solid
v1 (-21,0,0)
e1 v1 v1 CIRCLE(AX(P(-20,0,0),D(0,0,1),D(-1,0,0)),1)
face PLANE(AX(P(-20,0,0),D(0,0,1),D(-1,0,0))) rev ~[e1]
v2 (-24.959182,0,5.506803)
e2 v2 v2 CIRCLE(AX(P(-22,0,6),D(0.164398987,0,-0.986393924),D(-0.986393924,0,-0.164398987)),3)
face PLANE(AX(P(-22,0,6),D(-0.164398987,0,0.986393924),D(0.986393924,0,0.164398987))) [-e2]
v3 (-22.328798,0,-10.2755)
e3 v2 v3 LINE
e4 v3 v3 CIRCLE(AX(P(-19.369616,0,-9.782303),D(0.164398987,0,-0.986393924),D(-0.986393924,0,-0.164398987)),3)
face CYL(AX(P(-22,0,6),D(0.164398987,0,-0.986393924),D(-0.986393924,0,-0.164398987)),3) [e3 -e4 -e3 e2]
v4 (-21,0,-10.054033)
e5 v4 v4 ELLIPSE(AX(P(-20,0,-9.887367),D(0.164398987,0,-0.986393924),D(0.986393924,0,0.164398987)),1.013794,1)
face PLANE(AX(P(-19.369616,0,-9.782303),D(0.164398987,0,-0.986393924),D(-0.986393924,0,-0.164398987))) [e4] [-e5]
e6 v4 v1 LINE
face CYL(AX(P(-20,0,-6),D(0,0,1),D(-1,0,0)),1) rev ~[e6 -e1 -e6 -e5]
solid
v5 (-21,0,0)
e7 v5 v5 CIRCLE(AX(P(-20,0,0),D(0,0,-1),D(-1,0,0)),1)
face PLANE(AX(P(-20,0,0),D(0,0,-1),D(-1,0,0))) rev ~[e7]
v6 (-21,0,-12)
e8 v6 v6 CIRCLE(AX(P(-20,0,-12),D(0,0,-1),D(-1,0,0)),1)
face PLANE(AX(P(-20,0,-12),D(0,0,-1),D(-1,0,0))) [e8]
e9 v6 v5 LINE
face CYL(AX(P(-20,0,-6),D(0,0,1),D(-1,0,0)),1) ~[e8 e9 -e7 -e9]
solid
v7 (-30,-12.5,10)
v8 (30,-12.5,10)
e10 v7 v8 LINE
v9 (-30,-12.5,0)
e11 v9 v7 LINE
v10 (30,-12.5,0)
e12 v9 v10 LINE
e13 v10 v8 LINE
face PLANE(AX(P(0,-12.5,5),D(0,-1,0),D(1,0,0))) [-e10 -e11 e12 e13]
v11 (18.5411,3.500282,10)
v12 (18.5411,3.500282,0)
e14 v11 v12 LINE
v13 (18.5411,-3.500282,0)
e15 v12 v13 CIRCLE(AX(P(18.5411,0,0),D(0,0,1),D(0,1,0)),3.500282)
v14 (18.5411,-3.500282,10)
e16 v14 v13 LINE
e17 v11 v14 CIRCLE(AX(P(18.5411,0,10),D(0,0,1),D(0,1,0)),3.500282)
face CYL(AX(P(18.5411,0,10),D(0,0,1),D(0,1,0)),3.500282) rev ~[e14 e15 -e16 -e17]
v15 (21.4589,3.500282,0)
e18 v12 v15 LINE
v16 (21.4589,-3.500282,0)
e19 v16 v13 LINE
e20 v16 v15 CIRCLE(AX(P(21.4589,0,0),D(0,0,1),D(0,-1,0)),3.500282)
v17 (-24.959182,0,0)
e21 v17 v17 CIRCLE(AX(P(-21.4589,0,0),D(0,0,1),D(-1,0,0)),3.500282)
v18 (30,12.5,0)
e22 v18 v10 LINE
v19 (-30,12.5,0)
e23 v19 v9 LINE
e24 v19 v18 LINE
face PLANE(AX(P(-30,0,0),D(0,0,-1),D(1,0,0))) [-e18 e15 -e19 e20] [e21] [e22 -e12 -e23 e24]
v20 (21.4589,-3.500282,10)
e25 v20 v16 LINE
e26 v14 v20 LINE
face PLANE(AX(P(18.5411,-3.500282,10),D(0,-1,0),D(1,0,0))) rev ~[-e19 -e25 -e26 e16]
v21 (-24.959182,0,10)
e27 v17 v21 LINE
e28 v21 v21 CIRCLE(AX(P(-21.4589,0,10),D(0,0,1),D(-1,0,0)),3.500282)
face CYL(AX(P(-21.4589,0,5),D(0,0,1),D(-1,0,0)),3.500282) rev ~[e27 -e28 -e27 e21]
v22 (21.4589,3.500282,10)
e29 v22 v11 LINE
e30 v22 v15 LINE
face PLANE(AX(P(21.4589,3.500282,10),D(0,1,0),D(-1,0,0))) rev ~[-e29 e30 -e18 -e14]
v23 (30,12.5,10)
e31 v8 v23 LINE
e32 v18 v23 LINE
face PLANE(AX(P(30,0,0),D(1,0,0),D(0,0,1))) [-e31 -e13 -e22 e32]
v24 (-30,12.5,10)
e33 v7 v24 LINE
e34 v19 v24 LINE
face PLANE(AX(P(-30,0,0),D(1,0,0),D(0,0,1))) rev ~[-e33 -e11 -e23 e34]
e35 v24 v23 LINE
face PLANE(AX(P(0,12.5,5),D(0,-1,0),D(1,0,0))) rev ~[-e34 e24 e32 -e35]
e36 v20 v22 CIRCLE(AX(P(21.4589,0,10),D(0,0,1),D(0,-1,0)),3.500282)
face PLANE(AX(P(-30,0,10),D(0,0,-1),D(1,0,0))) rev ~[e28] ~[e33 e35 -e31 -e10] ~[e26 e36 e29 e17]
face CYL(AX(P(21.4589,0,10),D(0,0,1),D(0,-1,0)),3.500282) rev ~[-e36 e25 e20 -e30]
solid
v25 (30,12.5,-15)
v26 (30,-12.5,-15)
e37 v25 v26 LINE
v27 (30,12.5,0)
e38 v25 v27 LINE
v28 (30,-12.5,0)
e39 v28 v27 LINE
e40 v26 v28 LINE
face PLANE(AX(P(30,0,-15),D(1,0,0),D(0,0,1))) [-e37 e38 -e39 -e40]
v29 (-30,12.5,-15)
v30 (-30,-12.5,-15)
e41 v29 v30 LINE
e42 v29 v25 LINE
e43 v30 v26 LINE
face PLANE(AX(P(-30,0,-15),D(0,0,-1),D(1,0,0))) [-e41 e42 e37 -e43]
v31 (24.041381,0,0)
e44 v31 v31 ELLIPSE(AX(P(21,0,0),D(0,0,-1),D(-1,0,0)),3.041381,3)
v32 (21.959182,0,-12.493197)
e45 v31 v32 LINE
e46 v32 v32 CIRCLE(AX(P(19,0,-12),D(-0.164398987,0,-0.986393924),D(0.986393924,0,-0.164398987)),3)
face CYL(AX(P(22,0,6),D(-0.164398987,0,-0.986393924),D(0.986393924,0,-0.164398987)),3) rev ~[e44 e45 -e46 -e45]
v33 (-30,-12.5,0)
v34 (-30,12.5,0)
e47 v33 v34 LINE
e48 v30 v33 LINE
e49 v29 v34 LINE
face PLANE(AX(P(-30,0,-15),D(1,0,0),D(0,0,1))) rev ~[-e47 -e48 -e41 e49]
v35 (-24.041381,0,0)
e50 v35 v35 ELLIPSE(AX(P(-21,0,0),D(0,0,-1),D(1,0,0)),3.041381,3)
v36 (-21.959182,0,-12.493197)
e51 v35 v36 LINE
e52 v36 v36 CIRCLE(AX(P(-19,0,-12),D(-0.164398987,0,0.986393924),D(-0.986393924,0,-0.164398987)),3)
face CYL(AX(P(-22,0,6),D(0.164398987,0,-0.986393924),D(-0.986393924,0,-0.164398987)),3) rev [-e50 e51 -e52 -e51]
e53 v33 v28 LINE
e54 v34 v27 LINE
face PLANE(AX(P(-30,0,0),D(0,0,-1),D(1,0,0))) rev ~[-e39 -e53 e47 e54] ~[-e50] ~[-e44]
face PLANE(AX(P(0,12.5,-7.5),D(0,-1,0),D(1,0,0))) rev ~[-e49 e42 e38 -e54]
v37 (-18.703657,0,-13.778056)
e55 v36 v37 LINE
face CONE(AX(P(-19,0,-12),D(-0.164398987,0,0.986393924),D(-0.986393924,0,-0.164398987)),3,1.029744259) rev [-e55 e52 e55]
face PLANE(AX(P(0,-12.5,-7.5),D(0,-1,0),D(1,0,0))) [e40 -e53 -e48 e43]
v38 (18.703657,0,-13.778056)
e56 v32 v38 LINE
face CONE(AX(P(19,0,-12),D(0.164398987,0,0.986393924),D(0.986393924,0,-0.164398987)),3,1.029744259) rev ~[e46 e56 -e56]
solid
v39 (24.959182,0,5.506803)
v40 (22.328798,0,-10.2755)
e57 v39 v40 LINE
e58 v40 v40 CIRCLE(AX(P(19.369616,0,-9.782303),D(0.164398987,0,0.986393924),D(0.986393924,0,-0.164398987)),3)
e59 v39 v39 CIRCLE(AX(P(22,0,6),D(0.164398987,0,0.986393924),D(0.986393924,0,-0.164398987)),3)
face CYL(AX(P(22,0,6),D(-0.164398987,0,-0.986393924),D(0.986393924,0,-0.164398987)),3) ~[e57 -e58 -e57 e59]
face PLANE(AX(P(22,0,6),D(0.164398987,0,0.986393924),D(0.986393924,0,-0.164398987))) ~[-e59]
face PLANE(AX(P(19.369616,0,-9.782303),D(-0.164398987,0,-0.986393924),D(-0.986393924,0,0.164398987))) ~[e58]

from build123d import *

# Parameters (mm, degrees)
F0_W      = 60
F0_H      = 15
F1_DEPTH  = 12.5
F4_W      = 1
F4_H      = 12
F6_W      = 60
F6_H      = 10
F7_DEPTH  = 12.5
F8_W      = 3.5002815183
F8_H      = 10
F11_DEPTH = 25
F14_W     = 1
F14_H     = 12


# Not quite as in the source:
# - a pattern or mirror of a feature is missing from the dataset's text; its kind, count and spacing are read off the source's solid


with BuildPart() as f1:
    # F0 (on Front) → F1 (new body, symmetric)
    with BuildSketch(Plane.XZ):
        with Locations((0, -7.5)):
            Rectangle(F0_W, F0_H)
    extrude(amount=F1_DEPTH, both=True)

    # F2 (on Front) → F3 (revolve, cut)
    with BuildSketch(Plane.XZ):
        Polygon((-21.9591817715, -12.4931969619), (-18.7036573682, -13.778055791), (-22, 6), (-24.9591817715, 5.5068030381), align=None)
    f3 = revolve(axis=Axis((-20.3518286841, 0, -3.8890278955), (-0.1643989873, 0, 0.9863939238)), mode=Mode.SUBTRACT)

    # F3_copies: F3 across plane
    add(f3.mirror(Plane(origin=(0, 0, 0), x_dir=(0, 0, 1), z_dir=(1, 0, 0))), mode=Mode.SUBTRACT)


with BuildPart() as f5:
    # F4 (on Front) → F5 (revolve)
    with BuildSketch(Plane.XZ):
        with Locations((-20.5, -6)):
            Rectangle(F4_W, F4_H)
    revolve(axis=Axis((-20, 0, -6), (0, 0, -1)))


with BuildPart() as f7:
    # F6 (on Front) → F7 (new body, symmetric)
    with BuildSketch(Plane.XZ):
        with Locations((0, 5)):
            Rectangle(F6_W, F6_H)
    extrude(amount=F7_DEPTH, both=True)

    # F8 (on Front) → F9 (revolve, cut)
    with BuildSketch(Plane.XZ):
        with Locations((-23.2090410123, 5)):
            Rectangle(F8_W, F8_H)
    revolve(axis=Axis((-21.4589002532, 0, 5), (0, 0, 1)), mode=Mode.SUBTRACT)

    # F10 (on face) → F11 (cut)
    with BuildSketch(Plane.XY.offset(10)):
        with BuildLine():
            Line((21.4589002532, 3.5002815183), (18.5410997468, 3.5002815183))
            ThreePointArc((18.5410997468, 3.5002815183), (15.0408182285, 0), (18.5410997468, -3.5002815183))
            Line((18.5410997468, -3.5002815183), (21.4589002532, -3.5002815183))
            ThreePointArc((21.4589002532, -3.5002815183), (24.9591817715, 0), (21.4589002532, 3.5002815183))
        make_face()
    extrude(amount=-F11_DEPTH, mode=Mode.SUBTRACT)


with BuildPart() as f13:
    # F12 (on Front) → F13 (revolve)
    with BuildSketch(Plane.XZ):
        Polygon((-24.9591817715, 5.5068030381), (-22.3287979746, -10.2754997432), (-19.3696162031, -9.7823027813), (-22, 6), align=None)
    revolve(axis=Axis((-20.6848081016, 0, -1.8911513907), (0.1643989873, 0, -0.9863939238)))


with BuildPart() as f13_copies_1:
    # F13_copies: instance of F13
    add(f13.part.mirror(Plane(origin=(0, 0, 0), x_dir=(0, 0, 1), z_dir=(1, 0, 0))))


with BuildPart() as f13_1:
    add(f13.part)

    # F14 (on Front) → F15 (revolve, cut)
    with BuildSketch(Plane.XZ):
        with Locations((-20.5, -6)):
            Rectangle(F14_W, F14_H)
    revolve(axis=Axis((-20, 0, -6), (0, 0, 1)), mode=Mode.SUBTRACT)


solid = Compound([f1.part, f5.part, f7.part, f13_copies_1.part, f13_1.part])
